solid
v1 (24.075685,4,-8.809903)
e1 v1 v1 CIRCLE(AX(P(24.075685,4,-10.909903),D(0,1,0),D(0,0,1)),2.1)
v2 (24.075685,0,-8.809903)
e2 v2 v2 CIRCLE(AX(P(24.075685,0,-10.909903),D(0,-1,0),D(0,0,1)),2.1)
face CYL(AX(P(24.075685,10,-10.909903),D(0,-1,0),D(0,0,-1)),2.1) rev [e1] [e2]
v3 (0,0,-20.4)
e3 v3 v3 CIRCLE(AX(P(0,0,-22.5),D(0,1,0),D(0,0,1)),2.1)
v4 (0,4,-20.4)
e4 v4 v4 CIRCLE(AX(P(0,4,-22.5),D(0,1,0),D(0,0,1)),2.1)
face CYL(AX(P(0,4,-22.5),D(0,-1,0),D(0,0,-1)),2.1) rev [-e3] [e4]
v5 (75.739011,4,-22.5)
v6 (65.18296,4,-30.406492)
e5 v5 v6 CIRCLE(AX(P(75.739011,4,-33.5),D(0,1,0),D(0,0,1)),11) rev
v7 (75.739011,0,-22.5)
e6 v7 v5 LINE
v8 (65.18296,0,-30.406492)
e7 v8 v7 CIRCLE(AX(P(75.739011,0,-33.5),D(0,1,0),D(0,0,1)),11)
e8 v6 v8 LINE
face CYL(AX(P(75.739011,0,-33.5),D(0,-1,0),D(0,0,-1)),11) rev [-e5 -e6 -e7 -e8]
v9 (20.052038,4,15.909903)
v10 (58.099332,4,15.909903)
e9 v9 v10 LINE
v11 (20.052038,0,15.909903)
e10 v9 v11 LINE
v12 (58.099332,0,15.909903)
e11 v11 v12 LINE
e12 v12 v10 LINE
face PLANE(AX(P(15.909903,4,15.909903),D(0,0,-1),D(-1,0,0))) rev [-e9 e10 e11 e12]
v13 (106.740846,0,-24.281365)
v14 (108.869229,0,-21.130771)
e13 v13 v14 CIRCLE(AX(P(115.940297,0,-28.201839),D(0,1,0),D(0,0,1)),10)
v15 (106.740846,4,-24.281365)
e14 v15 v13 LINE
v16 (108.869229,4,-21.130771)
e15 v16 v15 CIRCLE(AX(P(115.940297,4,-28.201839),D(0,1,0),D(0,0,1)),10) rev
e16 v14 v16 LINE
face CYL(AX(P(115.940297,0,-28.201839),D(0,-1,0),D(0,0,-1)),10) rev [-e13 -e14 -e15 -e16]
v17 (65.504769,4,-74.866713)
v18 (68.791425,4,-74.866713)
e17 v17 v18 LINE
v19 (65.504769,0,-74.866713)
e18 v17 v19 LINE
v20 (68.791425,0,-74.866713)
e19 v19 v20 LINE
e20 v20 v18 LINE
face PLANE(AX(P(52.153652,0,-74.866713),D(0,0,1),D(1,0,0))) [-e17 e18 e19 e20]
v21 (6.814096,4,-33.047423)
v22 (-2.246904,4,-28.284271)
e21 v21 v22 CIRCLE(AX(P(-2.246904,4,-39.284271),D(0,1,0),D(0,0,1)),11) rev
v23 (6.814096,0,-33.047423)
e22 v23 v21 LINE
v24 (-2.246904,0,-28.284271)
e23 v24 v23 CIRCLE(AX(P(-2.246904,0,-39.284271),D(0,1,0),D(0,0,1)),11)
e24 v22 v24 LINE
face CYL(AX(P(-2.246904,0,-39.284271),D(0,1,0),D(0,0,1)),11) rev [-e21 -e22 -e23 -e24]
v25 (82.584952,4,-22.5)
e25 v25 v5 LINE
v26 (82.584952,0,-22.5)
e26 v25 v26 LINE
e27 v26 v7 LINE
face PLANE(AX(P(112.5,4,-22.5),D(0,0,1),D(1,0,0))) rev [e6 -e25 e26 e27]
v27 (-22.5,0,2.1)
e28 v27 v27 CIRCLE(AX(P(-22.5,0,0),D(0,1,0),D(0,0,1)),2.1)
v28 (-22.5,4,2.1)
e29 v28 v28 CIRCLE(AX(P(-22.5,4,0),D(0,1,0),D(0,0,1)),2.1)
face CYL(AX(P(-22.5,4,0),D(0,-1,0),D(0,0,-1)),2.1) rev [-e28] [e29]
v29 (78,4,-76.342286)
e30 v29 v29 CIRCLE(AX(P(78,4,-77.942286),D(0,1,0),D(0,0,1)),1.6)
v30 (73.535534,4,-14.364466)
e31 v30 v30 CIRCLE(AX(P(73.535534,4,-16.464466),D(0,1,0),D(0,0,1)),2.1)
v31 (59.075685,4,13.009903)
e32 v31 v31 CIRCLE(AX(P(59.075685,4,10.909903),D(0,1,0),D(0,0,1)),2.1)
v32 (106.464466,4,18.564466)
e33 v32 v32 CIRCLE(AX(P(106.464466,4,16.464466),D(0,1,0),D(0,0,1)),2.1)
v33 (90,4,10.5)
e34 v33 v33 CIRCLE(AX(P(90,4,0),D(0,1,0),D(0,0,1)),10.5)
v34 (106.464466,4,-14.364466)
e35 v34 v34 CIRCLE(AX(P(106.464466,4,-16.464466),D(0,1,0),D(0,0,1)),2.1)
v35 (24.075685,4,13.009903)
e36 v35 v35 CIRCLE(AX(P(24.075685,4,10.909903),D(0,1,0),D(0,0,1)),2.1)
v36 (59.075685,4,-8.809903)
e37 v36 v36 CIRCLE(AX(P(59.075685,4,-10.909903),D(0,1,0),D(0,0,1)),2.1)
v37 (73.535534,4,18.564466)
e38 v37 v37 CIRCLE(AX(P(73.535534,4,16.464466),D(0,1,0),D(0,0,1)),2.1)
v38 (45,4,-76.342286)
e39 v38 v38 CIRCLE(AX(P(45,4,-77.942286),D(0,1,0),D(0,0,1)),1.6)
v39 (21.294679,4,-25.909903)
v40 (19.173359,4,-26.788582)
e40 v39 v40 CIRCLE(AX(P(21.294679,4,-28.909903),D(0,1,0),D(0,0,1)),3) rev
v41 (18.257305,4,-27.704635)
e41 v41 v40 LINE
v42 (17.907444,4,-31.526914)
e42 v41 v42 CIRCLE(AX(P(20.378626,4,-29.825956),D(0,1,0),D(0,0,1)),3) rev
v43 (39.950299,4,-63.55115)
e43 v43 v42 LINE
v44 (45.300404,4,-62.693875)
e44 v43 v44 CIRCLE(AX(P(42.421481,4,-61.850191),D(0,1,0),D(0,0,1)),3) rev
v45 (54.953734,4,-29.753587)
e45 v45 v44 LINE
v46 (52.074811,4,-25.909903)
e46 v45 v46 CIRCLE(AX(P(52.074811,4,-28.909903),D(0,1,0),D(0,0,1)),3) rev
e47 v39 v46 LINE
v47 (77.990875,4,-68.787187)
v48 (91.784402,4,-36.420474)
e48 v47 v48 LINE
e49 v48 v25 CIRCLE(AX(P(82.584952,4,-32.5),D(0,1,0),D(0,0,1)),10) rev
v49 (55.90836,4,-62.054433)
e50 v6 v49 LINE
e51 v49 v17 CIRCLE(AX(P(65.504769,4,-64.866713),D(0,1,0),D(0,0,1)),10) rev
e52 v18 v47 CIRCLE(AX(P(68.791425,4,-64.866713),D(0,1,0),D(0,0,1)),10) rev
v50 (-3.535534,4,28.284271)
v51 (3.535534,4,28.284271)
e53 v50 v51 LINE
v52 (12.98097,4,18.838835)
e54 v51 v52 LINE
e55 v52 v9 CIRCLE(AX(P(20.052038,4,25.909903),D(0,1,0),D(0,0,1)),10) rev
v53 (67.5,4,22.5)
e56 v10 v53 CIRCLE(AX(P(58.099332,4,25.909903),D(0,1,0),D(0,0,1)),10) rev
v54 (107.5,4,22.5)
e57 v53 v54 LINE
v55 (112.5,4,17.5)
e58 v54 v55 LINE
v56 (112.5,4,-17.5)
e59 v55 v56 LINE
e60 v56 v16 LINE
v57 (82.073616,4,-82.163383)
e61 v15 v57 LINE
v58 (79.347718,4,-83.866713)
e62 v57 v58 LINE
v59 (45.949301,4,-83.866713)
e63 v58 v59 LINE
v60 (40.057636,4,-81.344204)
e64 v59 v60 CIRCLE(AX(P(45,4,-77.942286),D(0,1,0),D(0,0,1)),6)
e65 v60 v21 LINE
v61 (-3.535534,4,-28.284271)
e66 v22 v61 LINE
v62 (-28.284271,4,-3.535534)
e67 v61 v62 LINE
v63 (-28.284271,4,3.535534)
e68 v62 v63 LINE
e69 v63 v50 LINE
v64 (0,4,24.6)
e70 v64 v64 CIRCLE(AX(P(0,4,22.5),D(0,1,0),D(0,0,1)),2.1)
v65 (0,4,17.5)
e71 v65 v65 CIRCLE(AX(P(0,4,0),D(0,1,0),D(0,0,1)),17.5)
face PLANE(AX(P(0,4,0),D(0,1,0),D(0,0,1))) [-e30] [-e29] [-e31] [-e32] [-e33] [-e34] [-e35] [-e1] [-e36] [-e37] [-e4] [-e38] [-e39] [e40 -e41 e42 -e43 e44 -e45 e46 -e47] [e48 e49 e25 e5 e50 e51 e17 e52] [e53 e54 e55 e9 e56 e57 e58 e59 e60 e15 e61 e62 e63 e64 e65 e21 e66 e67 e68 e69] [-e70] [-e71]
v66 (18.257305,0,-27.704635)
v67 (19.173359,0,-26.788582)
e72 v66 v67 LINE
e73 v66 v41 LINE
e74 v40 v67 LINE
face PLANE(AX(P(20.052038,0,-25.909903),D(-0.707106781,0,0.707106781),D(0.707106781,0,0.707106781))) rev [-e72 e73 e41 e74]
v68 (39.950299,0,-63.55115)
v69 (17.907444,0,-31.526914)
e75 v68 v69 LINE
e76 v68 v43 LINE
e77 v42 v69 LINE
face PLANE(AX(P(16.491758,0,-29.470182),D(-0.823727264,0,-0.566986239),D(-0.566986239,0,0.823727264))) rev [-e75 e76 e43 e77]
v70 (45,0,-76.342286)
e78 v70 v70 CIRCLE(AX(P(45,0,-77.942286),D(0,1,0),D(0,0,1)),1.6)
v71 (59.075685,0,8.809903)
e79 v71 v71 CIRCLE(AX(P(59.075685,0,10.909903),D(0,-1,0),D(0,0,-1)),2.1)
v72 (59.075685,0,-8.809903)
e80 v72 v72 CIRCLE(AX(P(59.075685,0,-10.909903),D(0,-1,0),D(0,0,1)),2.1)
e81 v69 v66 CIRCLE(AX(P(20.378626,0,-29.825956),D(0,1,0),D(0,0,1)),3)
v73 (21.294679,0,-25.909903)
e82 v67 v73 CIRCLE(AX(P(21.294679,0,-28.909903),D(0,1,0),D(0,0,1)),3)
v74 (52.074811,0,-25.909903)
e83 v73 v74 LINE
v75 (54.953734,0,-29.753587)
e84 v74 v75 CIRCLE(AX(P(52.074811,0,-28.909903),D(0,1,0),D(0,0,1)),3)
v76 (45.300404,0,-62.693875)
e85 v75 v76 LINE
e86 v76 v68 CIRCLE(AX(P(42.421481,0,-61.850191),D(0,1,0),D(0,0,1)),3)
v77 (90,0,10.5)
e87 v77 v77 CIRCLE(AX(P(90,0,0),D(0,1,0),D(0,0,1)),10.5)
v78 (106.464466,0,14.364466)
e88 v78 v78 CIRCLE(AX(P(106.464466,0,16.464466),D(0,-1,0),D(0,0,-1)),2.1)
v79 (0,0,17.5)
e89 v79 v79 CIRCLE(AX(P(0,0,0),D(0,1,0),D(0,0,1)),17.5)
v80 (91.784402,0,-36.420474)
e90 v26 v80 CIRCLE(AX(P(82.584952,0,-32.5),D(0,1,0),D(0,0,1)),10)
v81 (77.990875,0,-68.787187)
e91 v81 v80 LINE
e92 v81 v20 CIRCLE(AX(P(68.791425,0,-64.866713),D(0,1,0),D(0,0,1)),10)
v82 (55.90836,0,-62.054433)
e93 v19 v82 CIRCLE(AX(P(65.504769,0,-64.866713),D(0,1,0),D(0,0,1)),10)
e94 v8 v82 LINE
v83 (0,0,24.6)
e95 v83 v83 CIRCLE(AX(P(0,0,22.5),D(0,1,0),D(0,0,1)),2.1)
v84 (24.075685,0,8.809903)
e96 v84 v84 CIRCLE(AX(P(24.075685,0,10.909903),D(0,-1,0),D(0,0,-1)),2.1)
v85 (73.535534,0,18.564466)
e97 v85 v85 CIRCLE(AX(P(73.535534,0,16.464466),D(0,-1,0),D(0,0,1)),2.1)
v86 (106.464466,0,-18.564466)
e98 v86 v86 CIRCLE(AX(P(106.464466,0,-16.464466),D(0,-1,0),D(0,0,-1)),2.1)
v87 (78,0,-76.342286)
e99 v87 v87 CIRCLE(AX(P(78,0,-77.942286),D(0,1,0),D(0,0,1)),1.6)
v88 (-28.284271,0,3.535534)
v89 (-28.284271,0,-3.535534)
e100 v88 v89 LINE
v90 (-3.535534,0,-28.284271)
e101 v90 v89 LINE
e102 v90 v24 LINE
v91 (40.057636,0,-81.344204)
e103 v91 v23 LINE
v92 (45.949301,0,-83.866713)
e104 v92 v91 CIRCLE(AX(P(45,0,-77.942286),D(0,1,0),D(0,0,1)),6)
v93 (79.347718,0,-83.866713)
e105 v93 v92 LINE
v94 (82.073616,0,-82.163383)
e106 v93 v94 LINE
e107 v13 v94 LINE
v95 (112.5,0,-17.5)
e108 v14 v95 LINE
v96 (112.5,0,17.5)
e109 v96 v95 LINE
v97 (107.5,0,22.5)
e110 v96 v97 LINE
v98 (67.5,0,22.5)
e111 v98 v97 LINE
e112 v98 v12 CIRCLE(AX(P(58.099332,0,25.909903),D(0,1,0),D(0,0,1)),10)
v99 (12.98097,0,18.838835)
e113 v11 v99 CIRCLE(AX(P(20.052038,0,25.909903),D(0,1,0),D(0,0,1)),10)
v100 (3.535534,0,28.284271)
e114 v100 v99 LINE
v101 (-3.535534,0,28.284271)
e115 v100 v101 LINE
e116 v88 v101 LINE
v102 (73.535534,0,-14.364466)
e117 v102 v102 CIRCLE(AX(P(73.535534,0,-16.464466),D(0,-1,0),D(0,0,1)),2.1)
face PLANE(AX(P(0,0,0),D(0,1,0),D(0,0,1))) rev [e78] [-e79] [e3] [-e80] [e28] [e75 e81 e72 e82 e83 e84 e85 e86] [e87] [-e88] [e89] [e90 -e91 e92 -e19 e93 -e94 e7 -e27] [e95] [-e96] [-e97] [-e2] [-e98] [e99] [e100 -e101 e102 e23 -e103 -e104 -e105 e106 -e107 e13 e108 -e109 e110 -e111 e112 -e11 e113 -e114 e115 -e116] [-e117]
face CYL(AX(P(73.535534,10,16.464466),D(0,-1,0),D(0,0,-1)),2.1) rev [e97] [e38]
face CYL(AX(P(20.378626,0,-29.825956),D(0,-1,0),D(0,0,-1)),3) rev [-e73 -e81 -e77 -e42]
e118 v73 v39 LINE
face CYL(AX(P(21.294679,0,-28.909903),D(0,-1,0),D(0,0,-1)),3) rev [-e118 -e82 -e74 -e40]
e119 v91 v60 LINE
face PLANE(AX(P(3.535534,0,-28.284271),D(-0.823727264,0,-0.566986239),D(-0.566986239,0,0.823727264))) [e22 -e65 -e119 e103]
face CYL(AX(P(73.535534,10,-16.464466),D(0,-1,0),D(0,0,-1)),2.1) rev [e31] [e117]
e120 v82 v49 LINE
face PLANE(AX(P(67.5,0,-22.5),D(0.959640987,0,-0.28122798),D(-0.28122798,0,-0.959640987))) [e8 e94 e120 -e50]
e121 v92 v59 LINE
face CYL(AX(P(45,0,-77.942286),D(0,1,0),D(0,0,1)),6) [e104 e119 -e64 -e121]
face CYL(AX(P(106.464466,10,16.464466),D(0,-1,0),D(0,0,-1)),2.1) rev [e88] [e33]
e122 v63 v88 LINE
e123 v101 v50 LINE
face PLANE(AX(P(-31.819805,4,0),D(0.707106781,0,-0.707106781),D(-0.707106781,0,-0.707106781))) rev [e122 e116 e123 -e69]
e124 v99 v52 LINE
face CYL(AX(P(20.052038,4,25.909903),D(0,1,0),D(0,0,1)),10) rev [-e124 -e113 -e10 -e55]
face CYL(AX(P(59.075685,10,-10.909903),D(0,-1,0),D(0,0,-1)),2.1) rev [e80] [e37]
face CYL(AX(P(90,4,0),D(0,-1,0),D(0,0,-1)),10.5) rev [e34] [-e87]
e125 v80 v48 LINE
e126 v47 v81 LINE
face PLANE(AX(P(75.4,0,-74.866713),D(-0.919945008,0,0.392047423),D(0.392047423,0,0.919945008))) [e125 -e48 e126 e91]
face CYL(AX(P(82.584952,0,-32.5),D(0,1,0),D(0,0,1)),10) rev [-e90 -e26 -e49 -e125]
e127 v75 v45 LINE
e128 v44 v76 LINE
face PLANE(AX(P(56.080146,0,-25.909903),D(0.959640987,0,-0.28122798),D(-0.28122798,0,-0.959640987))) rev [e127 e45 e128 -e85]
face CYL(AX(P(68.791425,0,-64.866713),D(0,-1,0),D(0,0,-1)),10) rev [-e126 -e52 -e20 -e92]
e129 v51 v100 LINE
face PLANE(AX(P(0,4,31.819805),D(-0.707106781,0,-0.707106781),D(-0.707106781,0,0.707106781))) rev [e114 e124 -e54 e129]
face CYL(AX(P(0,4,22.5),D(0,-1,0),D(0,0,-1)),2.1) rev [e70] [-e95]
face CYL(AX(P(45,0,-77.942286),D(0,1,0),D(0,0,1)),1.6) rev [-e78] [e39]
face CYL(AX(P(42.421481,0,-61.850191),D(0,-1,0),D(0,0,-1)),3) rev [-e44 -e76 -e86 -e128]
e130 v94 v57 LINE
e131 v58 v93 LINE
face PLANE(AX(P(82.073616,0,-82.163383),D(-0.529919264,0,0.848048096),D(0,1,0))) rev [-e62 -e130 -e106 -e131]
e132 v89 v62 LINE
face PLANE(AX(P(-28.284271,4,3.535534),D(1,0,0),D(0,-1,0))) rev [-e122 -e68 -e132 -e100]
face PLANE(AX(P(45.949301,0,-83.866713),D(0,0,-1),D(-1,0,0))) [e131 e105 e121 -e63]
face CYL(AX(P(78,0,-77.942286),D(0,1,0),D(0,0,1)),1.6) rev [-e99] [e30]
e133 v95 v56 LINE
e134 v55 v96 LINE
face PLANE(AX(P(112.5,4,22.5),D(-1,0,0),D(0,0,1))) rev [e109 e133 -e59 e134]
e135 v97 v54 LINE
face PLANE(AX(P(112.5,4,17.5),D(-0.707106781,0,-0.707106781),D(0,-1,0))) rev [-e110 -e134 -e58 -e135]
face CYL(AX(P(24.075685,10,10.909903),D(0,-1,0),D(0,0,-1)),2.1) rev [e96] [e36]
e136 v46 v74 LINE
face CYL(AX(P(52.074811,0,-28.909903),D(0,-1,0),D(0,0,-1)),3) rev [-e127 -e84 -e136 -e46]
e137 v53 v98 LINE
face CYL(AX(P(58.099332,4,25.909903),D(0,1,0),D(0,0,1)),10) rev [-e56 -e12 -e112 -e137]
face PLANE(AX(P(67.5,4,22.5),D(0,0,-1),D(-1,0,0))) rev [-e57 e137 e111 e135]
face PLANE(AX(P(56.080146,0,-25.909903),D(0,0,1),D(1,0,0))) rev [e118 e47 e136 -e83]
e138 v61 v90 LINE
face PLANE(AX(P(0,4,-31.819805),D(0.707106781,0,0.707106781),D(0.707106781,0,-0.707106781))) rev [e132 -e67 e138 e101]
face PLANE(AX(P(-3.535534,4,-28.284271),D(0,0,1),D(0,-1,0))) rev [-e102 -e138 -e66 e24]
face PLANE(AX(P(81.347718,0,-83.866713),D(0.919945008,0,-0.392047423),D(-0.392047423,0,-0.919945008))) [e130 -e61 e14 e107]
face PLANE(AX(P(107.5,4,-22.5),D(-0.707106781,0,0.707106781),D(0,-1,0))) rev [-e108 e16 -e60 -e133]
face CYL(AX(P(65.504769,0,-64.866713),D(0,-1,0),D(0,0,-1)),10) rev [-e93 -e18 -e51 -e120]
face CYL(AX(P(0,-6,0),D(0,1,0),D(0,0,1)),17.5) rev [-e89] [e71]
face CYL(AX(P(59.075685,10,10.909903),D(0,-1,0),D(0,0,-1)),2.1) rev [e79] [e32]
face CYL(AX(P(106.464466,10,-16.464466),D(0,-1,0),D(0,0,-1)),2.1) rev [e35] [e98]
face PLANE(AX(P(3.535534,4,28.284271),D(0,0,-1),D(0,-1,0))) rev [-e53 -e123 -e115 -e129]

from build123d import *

# Parameters (mm, degrees)
SKETCH_1_R          = 2.1
SKETCH_1_R_2        = 10.5
SKETCH_1_R_3        = 10
EXTRUDE_1_DEPTH     = 4
CHAMFER_1_SIZE      = 5
FILLET_1_R          = 10
SKETCH_2_R          = 2.1
CUT_EXTRUDE_1_DEPTH = 10
EXTRUDE_START       = -4
SKETCH_3_R          = 1.6
EXTRUDE_2_DEPTH     = 4
FILLET_2_R          = 3
FILLET_3_R          = 11
SKETCH_4_R          = 1.6
EXTRUDE_3_DEPTH     = 4
FILLET_4_R          = 10
CHAMFER_2_SIZE      = 2
CHAMFER_2_SIZE2     = 1.851556395
FILLET_5_R          = 10
SKETCH_5_R          = 17.5
CUT_EXTRUDE_2_DEPTH = 10


with BuildPart() as part:
    # 草图1 → 凸台-拉伸1 (new body)
    with BuildSketch(Plane(origin=(0, 0, 0), x_dir=(1, 0, 0), z_dir=(0, 1, 0))):
        Polygon((0, 31.819805153), (-31.819805153, 0), (0, -31.819805153), (15.909902577, -15.909902577), (67.5, -15.909902577), (67.5, -22.5), (112.5, -22.5), (112.5, 22.5), (67.5, 22.5), (67.5, 15.909902577), (15.909902577, 15.909902577), align=None)
        with Locations(Location((0, 14, 0), (0, 0, 270))):
            Circle(SKETCH_1_R, mode=Mode.SUBTRACT)
        with Locations(Location((14, 0, 0), (0, 0, 270))):
            Circle(SKETCH_1_R, mode=Mode.SUBTRACT)
        with Locations(Location((0, -14, 0), (0, 0, 270))):
            Circle(SKETCH_1_R, mode=Mode.SUBTRACT)
        with Locations(Location((-14, 0, 0), (0, 0, 270))):
            Circle(SKETCH_1_R, mode=Mode.SUBTRACT)
        with Locations(Location((90, 0, 0), (0, 0, 270))):
            Circle(SKETCH_1_R_2, mode=Mode.SUBTRACT)
        with Locations(Location((0, 22.5, 0), (0, 0, 270))):
            Circle(SKETCH_1_R, mode=Mode.SUBTRACT)
        with Locations(Location((0, -22.5, 0), (0, 0, 270))):
            Circle(SKETCH_1_R, mode=Mode.SUBTRACT)
        with Locations(Location((0, 0, 0), (0, 0, 270))):
            Circle(SKETCH_1_R_3, mode=Mode.SUBTRACT)
        with Locations(Location((-22.5, 0, 0), (0, 0, 270))):
            Circle(SKETCH_1_R, mode=Mode.SUBTRACT)
    extrude(amount=EXTRUDE_1_DEPTH)

    # 倒角1
    chamfer_1_edges = [part.edges().sort_by_distance(p)[0] for p in [
        (112.5, 2, -22.5),
        (112.5, 2, 22.5),
        (0, 2, 31.819805153),
        (-31.819805153, 2, 0),
        (0, 2, -31.819805153),
    ]]
    chamfer(chamfer_1_edges, length=CHAMFER_1_SIZE)

    # 圆角1
    # the kernel refuses this fillet: 10 mm, written as the material it adds along each edge
    with BuildSketch(Plane(origin=(15.909902577, 0, -15.909902577), x_dir=(-0.707106781186552, 0, -0.707106781186543), z_dir=(0, 1, 0))) as fillet_1_piece_1:
        with BuildLine():
            CenterArc((FILLET_1_R * 0.414213562373, -FILLET_1_R), FILLET_1_R, 90, 45)
            Line((-FILLET_1_R * 0.292893218813, -FILLET_1_R * 0.292893218813), (-FILLET_1_R * 0.307035354437, -FILLET_1_R * 0.27875108319))
            Line((-FILLET_1_R * 0.307035354437, -FILLET_1_R * 0.27875108319), (-FILLET_1_R * 0.00828427124746, FILLET_1_R * 0.02))
            Line((-FILLET_1_R * 0.00828427124746, FILLET_1_R * 0.02), (FILLET_1_R * 0.414213562373, FILLET_1_R * 0.02))
            Line((FILLET_1_R * 0.414213562373, FILLET_1_R * 0.02), (FILLET_1_R * 0.414213562373, 0))
        make_face()
    extrude(amount=4)
    with BuildSketch(Plane(origin=(15.909902577, 0, 15.909902577), x_dir=(-0.7071067811865422, 0, 0.707106781186553), z_dir=(0, 1, 0))) as fillet_1_piece_2:
        with BuildLine():
            CenterArc((FILLET_1_R * 0.414213562373, FILLET_1_R), FILLET_1_R, 225, 45)
            Line((-FILLET_1_R * 0.292893218813, FILLET_1_R * 0.292893218813), (-FILLET_1_R * 0.307035354437, FILLET_1_R * 0.27875108319))
            Line((-FILLET_1_R * 0.307035354437, FILLET_1_R * 0.27875108319), (-FILLET_1_R * 0.00828427124746, -FILLET_1_R * 0.02))
            Line((-FILLET_1_R * 0.00828427124746, -FILLET_1_R * 0.02), (FILLET_1_R * 0.414213562373, -FILLET_1_R * 0.02))
            Line((FILLET_1_R * 0.414213562373, -FILLET_1_R * 0.02), (FILLET_1_R * 0.414213562373, 0))
        make_face()
    extrude(amount=4)
    with BuildSketch(Plane(origin=(67.5, 0, 15.909902577), x_dir=(-1, 0, 0), z_dir=(0, 1, 0))) as fillet_1_piece_3:
        with BuildLine():
            CenterArc((9.400668296, 10), FILLET_1_R, 199.937217397, 70.062782603)
            Line((0, 6.590097423), (-0.188013366, 6.521899372))
            ThreePointArc((-0.188013366, 6.521899372), (-0.2, 3.295048712), (-0.2, 0))
            Line((-0.2, 0), (0, -0.2))
            Line((0, -0.2), (9.400668296, -0.2))
            Line((9.400668296, -0.2), (9.400668296, 0))
        make_face()
    extrude(amount=4)
    with BuildSketch(Plane(origin=(67.5, 0, -15.909902577), x_dir=(-1, 0, 0), z_dir=(0, 1, 0))) as fillet_1_piece_4:
        with BuildLine():
            CenterArc((9.400668296, -10), FILLET_1_R, 90, 70.062782603)
            Line((0, -6.590097423), (-0.188013366, -6.521899372))
            ThreePointArc((-0.188013366, -6.521899372), (-0.2, -3.295048712), (-0.2, 0))
            Line((-0.2, 0), (0, 0.2))
            Line((0, 0.2), (9.400668296, 0.2))
            Line((9.400668296, 0.2), (9.400668296, 0))
        make_face()
    extrude(amount=4)

    # 草图2 → 切除-拉伸1 (cut)
    with BuildSketch(Plane.XZ):
        with Locations(Location((106.464466094, 16.464466094, 0), (0, 0, 270))):
            Circle(SKETCH_2_R)
        with Locations(Location((106.464466094, -16.464466094, 0), (0, 0, 270))):
            Circle(SKETCH_2_R)
        with Locations(Location((73.535533906, -16.464466094, 0), (0, 0, 90))):
            Circle(SKETCH_2_R)
        with Locations(Location((73.535533906, 16.464466094, 0), (0, 0, 90))):
            Circle(SKETCH_2_R)
        with Locations(Location((24.075684952, 10.909902577, 0), (0, 0, 270))):
            Circle(SKETCH_2_R)
        with Locations(Location((59.075684952, 10.909902577, 0), (0, 0, 270))):
            Circle(SKETCH_2_R)
        with Locations(Location((59.075684952, -10.909902577, 0), (0, 0, 90))):
            Circle(SKETCH_2_R)
        with Locations(Location((24.075684952, -10.909902577, 0), (0, 0, 90))):
            Circle(SKETCH_2_R)
    extrude(amount=-CUT_EXTRUDE_1_DEPTH, mode=Mode.SUBTRACT)

    # 草图3 → 凸台-拉伸2 (add)
    with BuildSketch(Plane(origin=(0, 4, 0), x_dir=(1, 0, 0), z_dir=(0, 1, 0)).offset(EXTRUDE_START)):
        with BuildLine():
            Line((3.535533906, 28.284271247), (40.057636417, 81.344203773))
            ThreePointArc((40.057636417, 81.344203773), (45.94930127, 83.86671265), (50.75784592, 79.629654221))
            Line((50.75784592, 79.629654221), (67.5, 22.5))
            ThreePointArc((67.5, 22.5), (63.839583189, 17.721525883), (58.099331704, 15.909902577))
            Line((58.099331704, 15.909902577), (20.0520382, 15.909902577))
            ThreePointArc((20.0520382, 15.909902577), (16.225203877, 16.671107252), (12.980970389, 18.838834765))
            Line((12.980970389, 18.838834765), (3.535533906, 28.284271247))
        make_face()
        with Locations(Location((45, 77.942286341, 0), (0, 0, 270))):
            Circle(SKETCH_3_R, mode=Mode.SUBTRACT)
        Polygon((16.491758356, 29.470182421), (43.526560522, 68.746803428), (56.080145943, 25.909902577), (20.0520382, 25.909902577), align=None, mode=Mode.SUBTRACT)
    extrude(amount=EXTRUDE_2_DEPTH)

    # 圆角2
    fillet_2_edges = [part.edges().sort_by_distance(p)[0] for p in [
        (16.491758356, 2, -29.470182421),
        (43.526560522, 2, -68.746803428),
        (56.080145943, 2, -25.909902577),
        (20.0520382, 2, -25.909902577),
    ]]
    fillet(fillet_2_edges, radius=FILLET_2_R)

    # 圆角3
    fillet_3_edges = [part.edges().sort_by_distance(p)[0] for p in [
        (67.5, 2, -22.5),
        (3.535533906, 2, -28.284271247),
    ]]
    fillet(fillet_3_edges, radius=FILLET_3_R)

    # 草图4 → 凸台-拉伸3 (add)
    with BuildSketch(Plane(origin=(0, 4, 0), x_dir=(1, 0, 0), z_dir=(0, 1, 0)).offset(EXTRUDE_START)):
        with BuildLine():
            Line((45.94930127, 83.86671265), (81.347717681, 83.86671265))
            Line((81.347717681, 83.86671265), (107.5, 22.5))
            Line((107.5, 22.5), (97.716806526, 22.5))
            Line((97.716806526, 22.5), (75.4, 74.86671265))
            Line((75.4, 74.86671265), (52.153651701, 74.86671265))
            Line((52.153651701, 74.86671265), (50.75784592, 79.629654221))
            ThreePointArc((50.75784592, 79.629654221), (48.966689034, 82.443994695), (45.94930127, 83.86671265))
        make_face()
        with Locations(Location((78, 77.942286341, 0), (0, 0, 270))):
            Circle(SKETCH_4_R, mode=Mode.SUBTRACT)
    extrude(amount=EXTRUDE_3_DEPTH)

    # 圆角4
    fillet_4_edges = [part.edges().sort_by_distance(p)[0] for p in [
        (97.716806526, 2, -22.5),
        (75.4, 2, -74.86671265),
        (52.153651701, 2, -74.86671265),
    ]]
    fillet(fillet_4_edges, radius=FILLET_4_R)

    # 倒角2
    chamfer_2_edges = [part.edges().sort_by_distance(p)[0] for p in [
        (81.347717681, 2, -83.86671265),
    ]]
    chamfer_2_side = [part.faces().sort_by_distance(p)[0] for p in [
        (63.648509476, 2, -83.86671265),
    ]]
    chamfer(chamfer_2_edges, length=CHAMFER_2_SIZE, length2=CHAMFER_2_SIZE2, reference=chamfer_2_side[0])

    # 圆角5
    fillet_5_edges = [part.edges().sort_by_distance(p)[0] for p in [
        (107.5, 2, -22.5),
    ]]
    fillet(fillet_5_edges, radius=FILLET_5_R)

    # 草图5 → 切除-拉伸2 (cut)
    with BuildSketch(Plane(origin=(0, 4, 0), x_dir=(1, 0, 0), z_dir=(0, 1, 0))):
        with Locations(Location((0, 0, 0), (0, 0, 270))):
            Circle(SKETCH_5_R)
    extrude(amount=-CUT_EXTRUDE_2_DEPTH, mode=Mode.SUBTRACT)


solid = part.part
